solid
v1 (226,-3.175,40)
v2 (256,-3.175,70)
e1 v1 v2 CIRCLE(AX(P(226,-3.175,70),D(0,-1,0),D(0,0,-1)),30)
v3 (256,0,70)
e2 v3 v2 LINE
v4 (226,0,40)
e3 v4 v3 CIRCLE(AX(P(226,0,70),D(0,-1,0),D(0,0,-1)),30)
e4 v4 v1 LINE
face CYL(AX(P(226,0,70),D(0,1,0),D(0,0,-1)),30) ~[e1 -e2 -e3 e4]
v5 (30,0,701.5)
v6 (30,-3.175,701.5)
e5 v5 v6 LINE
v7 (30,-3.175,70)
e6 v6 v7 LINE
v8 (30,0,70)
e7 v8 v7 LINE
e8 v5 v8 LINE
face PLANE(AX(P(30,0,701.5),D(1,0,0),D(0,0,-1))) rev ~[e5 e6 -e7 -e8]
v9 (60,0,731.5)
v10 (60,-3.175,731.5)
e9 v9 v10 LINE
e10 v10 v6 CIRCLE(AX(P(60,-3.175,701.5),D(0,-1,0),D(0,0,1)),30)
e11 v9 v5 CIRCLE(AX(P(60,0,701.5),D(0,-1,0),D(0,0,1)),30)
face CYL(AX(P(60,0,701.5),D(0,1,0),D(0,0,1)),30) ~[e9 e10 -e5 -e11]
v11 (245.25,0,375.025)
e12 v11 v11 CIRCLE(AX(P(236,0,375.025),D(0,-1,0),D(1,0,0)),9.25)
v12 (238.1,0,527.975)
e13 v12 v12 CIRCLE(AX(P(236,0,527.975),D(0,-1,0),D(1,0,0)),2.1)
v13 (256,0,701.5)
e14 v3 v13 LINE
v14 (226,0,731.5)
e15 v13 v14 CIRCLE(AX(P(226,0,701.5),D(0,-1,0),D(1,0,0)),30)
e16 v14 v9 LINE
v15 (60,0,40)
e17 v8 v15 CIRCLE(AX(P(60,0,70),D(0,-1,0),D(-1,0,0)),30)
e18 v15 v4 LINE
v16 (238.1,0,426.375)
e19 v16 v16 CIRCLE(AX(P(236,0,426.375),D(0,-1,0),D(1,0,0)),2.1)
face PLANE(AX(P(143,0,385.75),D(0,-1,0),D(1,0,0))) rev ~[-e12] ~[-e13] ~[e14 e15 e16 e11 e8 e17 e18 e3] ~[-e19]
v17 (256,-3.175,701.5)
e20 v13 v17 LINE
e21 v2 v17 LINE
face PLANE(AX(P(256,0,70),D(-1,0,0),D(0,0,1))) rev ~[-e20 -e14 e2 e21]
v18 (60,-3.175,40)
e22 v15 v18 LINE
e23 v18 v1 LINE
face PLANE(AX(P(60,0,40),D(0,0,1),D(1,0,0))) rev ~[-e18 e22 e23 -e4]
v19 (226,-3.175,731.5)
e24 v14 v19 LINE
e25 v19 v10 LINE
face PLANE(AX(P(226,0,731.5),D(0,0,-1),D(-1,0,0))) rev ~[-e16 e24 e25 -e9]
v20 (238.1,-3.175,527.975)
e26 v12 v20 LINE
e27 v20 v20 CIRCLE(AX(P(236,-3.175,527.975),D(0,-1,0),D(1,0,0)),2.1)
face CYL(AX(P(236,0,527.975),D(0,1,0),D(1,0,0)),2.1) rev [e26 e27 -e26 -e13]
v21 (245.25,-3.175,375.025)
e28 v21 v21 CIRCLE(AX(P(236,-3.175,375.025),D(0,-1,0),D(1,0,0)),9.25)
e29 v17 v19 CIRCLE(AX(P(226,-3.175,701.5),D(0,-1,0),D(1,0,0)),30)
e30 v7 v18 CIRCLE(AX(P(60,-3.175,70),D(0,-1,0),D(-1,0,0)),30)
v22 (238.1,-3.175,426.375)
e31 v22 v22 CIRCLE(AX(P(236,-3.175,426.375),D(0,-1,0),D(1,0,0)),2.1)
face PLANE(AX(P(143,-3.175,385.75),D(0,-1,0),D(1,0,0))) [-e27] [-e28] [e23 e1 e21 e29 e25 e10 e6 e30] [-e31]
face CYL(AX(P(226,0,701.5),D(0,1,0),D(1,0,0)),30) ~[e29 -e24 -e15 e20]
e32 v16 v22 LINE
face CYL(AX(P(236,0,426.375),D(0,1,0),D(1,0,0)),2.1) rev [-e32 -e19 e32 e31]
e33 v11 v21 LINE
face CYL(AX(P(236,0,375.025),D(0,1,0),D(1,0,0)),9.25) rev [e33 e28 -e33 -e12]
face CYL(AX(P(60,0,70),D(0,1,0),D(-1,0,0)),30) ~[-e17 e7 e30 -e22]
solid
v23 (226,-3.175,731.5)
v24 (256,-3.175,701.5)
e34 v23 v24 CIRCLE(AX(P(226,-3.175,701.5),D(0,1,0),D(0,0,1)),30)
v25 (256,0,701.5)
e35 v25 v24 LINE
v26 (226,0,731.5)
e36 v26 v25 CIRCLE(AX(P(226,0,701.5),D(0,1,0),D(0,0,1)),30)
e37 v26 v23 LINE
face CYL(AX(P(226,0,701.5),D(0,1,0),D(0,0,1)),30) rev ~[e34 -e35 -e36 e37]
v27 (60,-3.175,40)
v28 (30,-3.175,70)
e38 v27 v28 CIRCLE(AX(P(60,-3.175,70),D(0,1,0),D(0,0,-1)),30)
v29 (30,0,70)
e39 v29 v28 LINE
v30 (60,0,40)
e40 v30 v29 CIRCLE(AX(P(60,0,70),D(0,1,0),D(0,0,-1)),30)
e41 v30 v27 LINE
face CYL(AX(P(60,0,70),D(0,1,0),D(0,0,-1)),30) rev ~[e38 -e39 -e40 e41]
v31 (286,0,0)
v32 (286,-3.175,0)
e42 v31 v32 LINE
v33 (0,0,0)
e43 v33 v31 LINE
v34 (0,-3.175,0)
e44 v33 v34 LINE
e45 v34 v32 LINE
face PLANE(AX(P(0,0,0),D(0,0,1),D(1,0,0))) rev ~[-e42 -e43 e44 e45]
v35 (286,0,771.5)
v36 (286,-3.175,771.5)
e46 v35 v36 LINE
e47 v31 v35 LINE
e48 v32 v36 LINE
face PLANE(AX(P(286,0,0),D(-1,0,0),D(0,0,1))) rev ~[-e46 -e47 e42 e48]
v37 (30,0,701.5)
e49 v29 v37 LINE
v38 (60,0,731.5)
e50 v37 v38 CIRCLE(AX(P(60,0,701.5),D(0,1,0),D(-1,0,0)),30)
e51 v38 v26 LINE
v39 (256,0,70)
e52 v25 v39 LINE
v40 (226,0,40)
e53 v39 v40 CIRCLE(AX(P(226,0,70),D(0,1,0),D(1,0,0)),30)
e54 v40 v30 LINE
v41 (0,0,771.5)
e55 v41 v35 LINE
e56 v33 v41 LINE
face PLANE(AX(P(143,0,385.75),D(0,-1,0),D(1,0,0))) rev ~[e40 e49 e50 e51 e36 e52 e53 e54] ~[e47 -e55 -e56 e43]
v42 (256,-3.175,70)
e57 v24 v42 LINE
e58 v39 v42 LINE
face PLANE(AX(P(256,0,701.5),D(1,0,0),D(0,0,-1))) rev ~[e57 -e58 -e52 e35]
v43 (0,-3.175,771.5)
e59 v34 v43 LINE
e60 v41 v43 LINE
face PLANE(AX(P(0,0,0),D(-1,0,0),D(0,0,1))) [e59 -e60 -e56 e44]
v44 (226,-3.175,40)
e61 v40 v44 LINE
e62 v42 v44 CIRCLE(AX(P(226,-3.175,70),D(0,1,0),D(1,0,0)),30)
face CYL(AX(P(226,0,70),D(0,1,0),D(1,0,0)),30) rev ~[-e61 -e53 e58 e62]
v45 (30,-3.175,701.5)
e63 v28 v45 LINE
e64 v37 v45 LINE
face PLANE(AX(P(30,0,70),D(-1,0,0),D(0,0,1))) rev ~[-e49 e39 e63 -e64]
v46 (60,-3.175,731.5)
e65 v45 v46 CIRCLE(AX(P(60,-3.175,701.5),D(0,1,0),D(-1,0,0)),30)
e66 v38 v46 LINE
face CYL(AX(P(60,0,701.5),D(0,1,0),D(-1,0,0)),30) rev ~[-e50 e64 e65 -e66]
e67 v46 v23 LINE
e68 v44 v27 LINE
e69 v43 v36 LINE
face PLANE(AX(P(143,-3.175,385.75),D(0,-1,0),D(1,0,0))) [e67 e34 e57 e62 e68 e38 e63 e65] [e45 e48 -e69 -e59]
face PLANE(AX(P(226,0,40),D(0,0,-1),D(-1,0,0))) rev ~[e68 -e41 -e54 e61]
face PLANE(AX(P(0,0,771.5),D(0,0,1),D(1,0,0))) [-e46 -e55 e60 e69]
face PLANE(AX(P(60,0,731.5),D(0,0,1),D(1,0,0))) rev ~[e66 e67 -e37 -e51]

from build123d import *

# Parameters (mm, degrees)
F0_W     = 286
F0_H     = 771.5
F1_DEPTH = 3.175
F0_R     = 9.25
F0_R_2   = 2.1
F2_DEPTH = 3.175


# Not quite as in the source:
# - a length typed as a fraction of an inch, garbled in the dataset ("3 / 203.2 mm" for 3/8 in), is restored


with BuildPart() as f1:
    # F0 (on Front) → F1 (new body)
    with BuildSketch(Plane.XZ):
        with Locations((143, 385.75)):
            Rectangle(F0_W, F0_H)
        with BuildLine():
            ThreePointArc((30, 701.5), (38.7867965644, 722.7132034356), (60, 731.5))
            Line((60, 731.5), (226, 731.5))
            ThreePointArc((226, 731.5), (247.2132034356, 722.7132034356), (256, 701.5))
            Line((256, 701.5), (256, 70))
            ThreePointArc((256, 70), (247.2132034356, 48.7867965644), (226, 40))
            Line((226, 40), (60, 40))
            ThreePointArc((60, 40), (38.7867965644, 48.7867965644), (30, 70))
            Line((30, 70), (30, 701.5))
        make_face(mode=Mode.SUBTRACT)
    extrude(amount=F1_DEPTH)


with BuildPart() as f2:
    # F0 (on Front) → F2 (new body)
    with BuildSketch(Plane.XZ):
        with BuildLine():
            Line((226, 731.5), (60, 731.5))
            ThreePointArc((60, 731.5), (38.7867965644, 722.7132034356), (30, 701.5))
            Line((30, 701.5), (30, 70))
            ThreePointArc((30, 70), (38.7867965644, 48.7867965644), (60, 40))
            Line((60, 40), (226, 40))
            ThreePointArc((226, 40), (247.2132034356, 48.7867965644), (256, 70))
            Line((256, 70), (256, 701.5))
            ThreePointArc((256, 701.5), (247.2132034356, 722.7132034356), (226, 731.5))
        make_face()
        with Locations((236, 375.025)):
            Circle(F0_R, mode=Mode.SUBTRACT)
        with Locations((236, 426.375)):
            Circle(F0_R_2, mode=Mode.SUBTRACT)
        with Locations((236, 527.975)):
            Circle(F0_R_2, mode=Mode.SUBTRACT)
    extrude(amount=F2_DEPTH)


solid = Compound([f1.part, f2.part])
